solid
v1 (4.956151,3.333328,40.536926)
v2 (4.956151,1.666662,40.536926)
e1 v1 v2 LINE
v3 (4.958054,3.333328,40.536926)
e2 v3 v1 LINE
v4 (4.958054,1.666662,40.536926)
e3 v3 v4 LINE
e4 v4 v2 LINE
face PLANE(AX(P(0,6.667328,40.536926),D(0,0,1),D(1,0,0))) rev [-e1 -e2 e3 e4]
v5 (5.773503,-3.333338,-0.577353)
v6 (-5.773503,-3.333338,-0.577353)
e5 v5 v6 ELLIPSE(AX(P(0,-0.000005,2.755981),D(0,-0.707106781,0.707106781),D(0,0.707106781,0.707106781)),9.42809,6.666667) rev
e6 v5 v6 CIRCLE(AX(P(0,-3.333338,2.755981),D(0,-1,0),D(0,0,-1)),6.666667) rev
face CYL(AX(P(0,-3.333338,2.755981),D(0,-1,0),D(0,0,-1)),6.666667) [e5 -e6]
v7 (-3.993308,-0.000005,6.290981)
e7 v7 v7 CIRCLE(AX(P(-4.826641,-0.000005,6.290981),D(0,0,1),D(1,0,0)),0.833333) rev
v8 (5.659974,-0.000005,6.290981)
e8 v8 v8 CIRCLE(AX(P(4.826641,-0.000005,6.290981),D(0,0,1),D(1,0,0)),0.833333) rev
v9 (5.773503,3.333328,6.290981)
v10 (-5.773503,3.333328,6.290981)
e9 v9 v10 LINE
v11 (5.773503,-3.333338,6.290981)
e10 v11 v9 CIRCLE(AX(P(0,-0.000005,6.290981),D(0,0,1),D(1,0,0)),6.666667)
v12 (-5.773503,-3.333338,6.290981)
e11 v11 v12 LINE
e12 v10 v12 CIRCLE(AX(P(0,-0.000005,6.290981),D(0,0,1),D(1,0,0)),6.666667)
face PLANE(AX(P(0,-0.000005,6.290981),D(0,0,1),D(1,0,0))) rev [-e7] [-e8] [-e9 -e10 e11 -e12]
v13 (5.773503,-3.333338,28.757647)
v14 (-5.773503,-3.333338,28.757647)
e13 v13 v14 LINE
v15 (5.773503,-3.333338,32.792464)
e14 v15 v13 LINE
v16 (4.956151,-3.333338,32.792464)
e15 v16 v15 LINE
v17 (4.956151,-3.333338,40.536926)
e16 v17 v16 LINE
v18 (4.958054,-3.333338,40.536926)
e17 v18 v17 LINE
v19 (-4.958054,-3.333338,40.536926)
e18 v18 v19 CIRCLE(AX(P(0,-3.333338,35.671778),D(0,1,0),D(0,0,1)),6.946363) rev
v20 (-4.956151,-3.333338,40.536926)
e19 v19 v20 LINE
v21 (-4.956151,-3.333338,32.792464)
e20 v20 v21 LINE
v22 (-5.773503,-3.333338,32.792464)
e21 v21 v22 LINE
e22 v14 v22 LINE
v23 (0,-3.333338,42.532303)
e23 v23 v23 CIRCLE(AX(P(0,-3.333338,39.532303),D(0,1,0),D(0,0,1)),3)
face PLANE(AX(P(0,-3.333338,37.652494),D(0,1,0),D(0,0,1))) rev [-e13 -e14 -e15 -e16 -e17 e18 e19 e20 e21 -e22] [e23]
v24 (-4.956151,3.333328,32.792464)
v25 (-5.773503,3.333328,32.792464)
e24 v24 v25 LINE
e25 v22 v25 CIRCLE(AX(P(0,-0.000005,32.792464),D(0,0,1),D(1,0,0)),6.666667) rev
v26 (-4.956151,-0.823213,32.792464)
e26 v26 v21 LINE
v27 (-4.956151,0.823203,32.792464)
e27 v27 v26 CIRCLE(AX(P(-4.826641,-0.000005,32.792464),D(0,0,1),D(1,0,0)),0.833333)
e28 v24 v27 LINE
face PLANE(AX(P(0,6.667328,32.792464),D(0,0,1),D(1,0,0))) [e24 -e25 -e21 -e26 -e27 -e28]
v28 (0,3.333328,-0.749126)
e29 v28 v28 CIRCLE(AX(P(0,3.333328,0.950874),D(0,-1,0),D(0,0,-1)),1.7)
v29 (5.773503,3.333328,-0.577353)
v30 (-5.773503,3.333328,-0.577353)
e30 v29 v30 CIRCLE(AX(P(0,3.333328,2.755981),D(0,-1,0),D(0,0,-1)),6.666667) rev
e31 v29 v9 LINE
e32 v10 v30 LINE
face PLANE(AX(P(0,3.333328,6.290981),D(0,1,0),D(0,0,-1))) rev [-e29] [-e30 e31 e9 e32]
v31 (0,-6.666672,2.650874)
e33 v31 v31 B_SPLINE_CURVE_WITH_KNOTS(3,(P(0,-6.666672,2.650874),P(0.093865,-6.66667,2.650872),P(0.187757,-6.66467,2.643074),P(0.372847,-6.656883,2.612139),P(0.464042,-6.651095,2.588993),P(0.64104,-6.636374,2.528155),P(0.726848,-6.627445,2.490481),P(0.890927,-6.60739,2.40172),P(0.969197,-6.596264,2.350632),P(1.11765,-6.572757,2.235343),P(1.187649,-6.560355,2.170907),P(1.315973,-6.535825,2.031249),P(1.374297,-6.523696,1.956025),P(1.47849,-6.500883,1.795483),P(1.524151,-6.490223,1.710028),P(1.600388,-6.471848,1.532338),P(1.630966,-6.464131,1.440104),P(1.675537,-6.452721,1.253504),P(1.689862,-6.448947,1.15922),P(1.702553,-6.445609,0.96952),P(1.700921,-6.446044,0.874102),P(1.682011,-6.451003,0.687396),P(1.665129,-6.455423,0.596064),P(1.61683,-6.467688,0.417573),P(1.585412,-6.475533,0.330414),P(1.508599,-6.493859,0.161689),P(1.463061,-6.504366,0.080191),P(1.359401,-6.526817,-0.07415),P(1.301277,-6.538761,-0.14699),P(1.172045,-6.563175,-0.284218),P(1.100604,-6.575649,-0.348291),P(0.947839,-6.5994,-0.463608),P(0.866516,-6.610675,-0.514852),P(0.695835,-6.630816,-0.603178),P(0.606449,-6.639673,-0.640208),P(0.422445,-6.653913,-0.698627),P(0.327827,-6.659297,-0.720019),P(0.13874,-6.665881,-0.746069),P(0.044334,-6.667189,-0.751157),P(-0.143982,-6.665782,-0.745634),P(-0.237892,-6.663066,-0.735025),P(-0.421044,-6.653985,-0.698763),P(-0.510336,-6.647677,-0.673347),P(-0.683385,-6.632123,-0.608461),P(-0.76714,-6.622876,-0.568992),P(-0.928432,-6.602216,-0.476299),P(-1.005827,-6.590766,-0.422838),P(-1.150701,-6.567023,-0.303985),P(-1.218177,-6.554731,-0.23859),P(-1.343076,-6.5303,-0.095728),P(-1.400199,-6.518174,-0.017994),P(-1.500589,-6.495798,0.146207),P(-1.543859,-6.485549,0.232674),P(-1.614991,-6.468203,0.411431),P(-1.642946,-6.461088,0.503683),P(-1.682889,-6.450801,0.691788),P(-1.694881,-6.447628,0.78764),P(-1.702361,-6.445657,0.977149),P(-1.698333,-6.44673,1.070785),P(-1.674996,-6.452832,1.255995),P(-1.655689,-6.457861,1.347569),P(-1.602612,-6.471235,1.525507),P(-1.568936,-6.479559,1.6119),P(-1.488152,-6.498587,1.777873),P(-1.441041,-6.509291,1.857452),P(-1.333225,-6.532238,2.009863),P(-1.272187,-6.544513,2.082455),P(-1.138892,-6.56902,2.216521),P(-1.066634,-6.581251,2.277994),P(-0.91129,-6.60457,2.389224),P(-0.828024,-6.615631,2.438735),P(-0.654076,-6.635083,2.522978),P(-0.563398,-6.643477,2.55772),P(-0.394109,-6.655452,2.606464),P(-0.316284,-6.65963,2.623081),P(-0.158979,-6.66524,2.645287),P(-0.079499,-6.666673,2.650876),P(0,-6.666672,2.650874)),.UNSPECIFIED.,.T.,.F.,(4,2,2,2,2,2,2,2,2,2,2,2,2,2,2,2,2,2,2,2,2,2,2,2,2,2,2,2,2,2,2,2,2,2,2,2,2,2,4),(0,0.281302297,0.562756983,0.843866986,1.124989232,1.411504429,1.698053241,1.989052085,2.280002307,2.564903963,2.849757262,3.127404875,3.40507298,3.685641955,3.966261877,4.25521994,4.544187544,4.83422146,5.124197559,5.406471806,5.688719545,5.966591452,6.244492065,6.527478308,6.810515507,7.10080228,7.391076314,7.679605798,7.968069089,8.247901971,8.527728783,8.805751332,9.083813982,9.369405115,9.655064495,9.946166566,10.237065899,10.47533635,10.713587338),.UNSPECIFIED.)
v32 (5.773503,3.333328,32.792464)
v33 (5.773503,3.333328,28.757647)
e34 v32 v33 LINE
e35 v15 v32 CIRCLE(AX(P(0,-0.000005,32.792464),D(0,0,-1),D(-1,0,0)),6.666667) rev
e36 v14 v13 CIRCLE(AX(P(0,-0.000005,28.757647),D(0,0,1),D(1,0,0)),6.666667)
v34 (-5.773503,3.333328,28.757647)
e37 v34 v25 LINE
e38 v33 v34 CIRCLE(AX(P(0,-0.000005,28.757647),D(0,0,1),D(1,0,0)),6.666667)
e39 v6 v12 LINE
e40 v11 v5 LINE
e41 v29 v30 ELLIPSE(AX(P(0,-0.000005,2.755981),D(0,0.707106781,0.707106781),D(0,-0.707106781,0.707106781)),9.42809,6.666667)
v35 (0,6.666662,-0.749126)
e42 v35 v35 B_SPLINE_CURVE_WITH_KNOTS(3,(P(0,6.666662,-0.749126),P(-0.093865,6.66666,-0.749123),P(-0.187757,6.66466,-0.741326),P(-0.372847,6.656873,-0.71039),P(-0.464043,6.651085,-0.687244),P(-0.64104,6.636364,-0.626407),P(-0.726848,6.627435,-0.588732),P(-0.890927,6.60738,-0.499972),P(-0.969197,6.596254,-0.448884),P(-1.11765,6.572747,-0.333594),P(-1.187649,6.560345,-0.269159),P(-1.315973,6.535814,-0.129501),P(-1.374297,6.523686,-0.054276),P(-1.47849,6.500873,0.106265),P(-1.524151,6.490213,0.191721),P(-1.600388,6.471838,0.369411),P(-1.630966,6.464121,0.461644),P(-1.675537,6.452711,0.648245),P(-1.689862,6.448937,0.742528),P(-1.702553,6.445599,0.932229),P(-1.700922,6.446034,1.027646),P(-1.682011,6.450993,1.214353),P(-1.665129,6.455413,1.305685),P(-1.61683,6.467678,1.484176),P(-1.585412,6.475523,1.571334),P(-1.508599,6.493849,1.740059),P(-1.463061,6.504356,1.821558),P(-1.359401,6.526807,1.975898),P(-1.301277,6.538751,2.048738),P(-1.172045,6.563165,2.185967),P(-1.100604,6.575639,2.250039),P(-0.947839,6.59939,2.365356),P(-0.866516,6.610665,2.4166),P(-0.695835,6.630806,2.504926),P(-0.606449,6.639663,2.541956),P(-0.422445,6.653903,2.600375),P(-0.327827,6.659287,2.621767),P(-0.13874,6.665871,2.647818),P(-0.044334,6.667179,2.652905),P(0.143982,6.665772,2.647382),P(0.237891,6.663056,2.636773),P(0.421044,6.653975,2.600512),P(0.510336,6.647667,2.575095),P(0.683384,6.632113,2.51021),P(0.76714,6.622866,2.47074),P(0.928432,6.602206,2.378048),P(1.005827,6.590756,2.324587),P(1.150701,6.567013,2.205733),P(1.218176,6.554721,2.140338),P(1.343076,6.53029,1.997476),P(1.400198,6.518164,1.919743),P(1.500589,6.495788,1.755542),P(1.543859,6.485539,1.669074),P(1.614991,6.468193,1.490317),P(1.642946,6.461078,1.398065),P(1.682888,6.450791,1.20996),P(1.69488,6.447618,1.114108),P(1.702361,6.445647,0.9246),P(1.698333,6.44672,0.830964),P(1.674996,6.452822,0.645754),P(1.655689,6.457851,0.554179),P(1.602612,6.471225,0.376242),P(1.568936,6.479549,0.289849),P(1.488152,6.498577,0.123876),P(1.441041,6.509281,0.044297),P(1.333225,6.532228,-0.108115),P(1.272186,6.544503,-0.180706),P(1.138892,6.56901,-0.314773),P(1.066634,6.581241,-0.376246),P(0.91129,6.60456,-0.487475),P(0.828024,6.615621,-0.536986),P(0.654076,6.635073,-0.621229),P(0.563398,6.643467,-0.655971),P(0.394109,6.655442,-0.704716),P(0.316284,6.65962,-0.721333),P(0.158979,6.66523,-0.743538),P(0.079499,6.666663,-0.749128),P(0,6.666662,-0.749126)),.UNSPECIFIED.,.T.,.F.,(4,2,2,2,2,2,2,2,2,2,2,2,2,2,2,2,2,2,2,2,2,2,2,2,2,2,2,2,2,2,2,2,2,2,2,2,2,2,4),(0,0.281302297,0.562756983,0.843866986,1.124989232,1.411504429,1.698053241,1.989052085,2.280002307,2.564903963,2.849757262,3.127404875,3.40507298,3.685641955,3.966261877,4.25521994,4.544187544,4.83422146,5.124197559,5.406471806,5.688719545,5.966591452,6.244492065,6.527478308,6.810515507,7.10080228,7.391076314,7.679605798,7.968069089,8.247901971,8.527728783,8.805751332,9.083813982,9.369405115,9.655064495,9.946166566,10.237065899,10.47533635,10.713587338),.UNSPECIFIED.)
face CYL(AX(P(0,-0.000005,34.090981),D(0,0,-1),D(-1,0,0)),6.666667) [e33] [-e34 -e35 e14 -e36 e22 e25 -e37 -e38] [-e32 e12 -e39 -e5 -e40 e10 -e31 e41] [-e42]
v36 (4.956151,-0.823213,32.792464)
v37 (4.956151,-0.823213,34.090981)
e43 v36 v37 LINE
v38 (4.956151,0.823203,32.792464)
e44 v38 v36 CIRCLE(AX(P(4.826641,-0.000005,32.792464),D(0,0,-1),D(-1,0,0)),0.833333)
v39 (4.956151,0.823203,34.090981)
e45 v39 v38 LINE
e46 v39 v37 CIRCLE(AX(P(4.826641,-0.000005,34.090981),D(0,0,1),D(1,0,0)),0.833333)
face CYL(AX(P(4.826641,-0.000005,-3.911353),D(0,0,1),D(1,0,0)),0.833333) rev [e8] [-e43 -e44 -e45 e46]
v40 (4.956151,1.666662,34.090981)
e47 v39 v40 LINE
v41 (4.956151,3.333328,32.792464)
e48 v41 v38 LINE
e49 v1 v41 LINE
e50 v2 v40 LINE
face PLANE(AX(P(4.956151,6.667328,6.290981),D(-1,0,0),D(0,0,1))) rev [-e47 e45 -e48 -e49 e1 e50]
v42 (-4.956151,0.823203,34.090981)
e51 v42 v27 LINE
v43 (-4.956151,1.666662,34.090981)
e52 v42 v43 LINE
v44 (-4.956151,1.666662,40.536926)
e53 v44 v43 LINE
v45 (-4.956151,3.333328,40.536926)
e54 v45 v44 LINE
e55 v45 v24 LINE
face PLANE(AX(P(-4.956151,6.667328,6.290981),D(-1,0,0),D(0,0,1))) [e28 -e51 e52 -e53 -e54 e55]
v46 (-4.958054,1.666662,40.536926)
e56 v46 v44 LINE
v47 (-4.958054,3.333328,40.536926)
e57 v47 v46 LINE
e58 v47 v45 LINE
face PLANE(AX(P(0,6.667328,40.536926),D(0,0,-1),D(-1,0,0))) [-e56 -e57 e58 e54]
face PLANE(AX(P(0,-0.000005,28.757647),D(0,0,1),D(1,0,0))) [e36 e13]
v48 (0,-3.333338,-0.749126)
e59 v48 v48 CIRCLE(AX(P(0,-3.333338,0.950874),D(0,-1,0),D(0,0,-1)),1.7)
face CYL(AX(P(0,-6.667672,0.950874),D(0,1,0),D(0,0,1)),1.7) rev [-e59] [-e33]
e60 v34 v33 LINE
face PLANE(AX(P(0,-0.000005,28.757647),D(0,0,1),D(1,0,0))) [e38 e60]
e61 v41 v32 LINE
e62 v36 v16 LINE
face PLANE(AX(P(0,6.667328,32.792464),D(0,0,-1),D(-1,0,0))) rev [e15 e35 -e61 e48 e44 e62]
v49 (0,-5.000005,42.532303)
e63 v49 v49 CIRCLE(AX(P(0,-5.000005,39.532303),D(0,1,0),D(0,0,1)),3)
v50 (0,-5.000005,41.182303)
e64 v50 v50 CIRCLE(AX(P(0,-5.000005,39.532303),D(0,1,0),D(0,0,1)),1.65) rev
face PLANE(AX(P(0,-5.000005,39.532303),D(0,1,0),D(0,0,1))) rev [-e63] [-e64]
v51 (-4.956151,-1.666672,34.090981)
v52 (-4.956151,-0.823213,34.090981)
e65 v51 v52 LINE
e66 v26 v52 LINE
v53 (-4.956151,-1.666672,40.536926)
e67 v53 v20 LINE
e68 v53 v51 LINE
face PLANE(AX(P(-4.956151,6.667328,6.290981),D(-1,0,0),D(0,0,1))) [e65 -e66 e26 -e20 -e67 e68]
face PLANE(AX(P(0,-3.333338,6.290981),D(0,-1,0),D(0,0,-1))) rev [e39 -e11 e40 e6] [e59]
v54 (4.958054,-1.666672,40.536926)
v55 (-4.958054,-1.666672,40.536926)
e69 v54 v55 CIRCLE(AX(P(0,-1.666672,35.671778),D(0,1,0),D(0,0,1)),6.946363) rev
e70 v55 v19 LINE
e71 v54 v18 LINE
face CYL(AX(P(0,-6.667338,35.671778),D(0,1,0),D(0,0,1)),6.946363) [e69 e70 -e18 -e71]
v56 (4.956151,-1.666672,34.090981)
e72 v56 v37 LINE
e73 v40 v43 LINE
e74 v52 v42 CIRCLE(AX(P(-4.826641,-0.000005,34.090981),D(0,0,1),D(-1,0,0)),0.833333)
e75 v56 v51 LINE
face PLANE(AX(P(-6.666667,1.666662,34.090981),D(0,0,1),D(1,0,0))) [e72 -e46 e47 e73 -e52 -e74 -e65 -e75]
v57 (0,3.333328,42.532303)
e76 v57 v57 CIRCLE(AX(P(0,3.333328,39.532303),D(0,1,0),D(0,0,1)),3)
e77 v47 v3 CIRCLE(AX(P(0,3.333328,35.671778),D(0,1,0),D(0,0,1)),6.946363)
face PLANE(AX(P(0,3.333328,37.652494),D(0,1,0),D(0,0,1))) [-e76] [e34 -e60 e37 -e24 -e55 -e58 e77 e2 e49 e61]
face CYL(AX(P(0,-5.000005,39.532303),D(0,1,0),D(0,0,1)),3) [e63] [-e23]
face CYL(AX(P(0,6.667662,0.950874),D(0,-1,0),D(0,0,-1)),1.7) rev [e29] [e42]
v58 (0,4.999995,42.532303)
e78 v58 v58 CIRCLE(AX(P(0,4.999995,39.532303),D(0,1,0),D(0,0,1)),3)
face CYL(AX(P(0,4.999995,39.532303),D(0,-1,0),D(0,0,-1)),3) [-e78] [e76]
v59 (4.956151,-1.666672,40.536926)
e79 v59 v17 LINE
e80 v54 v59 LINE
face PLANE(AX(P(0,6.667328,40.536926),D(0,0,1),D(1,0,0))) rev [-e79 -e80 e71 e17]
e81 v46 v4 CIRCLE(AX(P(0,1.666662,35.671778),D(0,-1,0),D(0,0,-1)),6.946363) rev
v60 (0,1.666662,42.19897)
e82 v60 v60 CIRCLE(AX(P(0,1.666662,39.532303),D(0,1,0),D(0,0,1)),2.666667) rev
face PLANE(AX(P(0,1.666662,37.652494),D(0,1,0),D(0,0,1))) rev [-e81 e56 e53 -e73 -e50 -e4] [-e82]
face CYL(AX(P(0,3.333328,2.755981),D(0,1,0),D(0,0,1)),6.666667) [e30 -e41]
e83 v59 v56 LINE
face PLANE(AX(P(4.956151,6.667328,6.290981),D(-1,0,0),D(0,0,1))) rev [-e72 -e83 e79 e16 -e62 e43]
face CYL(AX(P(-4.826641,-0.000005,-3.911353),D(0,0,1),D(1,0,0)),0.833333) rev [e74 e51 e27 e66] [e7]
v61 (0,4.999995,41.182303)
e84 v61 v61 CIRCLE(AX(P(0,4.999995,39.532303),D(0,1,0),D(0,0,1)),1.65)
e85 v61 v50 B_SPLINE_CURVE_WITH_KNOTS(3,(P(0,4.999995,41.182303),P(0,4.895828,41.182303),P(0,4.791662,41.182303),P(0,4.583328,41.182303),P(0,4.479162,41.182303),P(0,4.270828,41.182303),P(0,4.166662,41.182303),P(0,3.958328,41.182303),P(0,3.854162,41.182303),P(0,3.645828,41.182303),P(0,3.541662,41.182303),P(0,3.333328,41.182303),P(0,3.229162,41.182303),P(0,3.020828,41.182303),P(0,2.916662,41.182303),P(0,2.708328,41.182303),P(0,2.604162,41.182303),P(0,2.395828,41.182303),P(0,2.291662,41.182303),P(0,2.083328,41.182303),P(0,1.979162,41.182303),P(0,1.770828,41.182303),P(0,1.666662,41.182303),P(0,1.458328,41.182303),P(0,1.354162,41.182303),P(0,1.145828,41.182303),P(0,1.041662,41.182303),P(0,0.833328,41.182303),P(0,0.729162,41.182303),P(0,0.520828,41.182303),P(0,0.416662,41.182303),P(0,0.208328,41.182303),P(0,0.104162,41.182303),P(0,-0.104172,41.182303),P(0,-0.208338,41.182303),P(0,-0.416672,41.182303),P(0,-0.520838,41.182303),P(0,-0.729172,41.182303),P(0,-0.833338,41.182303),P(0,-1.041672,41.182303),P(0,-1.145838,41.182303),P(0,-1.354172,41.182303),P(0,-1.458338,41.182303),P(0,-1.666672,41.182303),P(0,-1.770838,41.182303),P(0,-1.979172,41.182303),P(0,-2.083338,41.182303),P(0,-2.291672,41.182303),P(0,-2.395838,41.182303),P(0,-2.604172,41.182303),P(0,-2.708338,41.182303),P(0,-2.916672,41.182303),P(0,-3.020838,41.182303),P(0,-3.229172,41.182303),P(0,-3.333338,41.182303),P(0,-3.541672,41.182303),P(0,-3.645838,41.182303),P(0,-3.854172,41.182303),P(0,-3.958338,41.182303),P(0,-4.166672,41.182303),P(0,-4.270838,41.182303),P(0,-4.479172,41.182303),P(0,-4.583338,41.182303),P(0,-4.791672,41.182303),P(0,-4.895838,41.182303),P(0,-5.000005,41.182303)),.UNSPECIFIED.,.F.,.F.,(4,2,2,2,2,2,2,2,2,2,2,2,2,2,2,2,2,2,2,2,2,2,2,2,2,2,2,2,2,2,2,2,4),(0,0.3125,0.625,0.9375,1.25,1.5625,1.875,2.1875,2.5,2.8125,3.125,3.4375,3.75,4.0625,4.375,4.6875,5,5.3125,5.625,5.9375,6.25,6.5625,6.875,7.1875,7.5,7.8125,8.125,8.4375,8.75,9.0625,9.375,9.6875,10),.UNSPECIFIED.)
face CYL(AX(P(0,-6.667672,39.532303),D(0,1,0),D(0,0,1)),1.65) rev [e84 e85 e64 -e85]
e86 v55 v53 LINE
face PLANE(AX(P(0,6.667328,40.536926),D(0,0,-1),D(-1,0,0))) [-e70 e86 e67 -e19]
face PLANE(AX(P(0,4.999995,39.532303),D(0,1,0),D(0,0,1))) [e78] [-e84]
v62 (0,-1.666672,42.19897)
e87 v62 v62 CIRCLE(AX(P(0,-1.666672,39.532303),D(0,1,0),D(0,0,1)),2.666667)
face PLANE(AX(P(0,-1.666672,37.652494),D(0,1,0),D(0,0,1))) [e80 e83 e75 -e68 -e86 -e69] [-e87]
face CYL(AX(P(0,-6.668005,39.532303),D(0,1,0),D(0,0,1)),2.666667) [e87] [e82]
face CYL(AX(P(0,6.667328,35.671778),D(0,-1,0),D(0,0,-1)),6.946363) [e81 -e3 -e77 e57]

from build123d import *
from build123d.topology import SkipClean

# Parameters (mm, degrees)
SKETCH2_R                       = 10
PHALANGE_LENGTH_DEPTH           = 41.7
BOSS_EXTRUDE3_DEPTH             = 5
BOSS_EXTRUDE4_DEPTH             = 5
BOSS_EXTRUDE4_DEPTH_BACK        = 5
CUT_EXTRUDE2_START              = -15.3025
CUT_EXTRUDE2_DEPTH              = 15.3025
SKETCH7_R                       = 1.65
CUT_EXTRUDE3_DEPTH              = 10
CUT_EXTRUDE4_DEPTH              = 2.5
CUT_EXTRUDE4_DEPTH_BACK         = 2.5
CUT_EXTRUDE7_REACH              = 61.833
SKETCH4_R                       = 1.65
CUT_EXTRUDE7_DIRECTION_2_REACH  = 61.833
CUT_EXTRUDE_THIN1_START         = 41.7
CUT_EXTRUDE_THIN1_DEPTH         = 10.361670454
BOSS_EXTRUDE5_REACH             = 61.255
SKETCH9_R                       = 4
SKETCH9_R_2                     = 1.65
CUT_EXTRUDE8_REACH              = 60.731
SKETCH10_R                      = 1.25
CUT_EXTRUDE9_START              = -8
CUT_EXTRUDE9_DEPTH              = 8
CUT_EXTRUDE10_REACH             = 61.255
CUT_EXTRUDE10_DIRECTION_2_REACH = 61.255
CUT_EXTRUDE11_START             = -10
CUT_EXTRUDE11_OUTLINE_W         = 2.565773848
CUT_EXTRUDE11_OUTLINE_H         = 11.6166929
CUT_EXTRUDE11_DEPTH             = 10
BOSS_EXTRUDE6_START             = 7.5
SKETCH14_R                      = 4.5
SKETCH14_R_2                    = 1.65
BOSS_EXTRUDE6_DEPTH             = 2.5
BOSS_EXTRUDE7_START             = -7.5
SKETCH14_2_R                    = 4.5
SKETCH14_2_R_2                  = 1.65
BOSS_EXTRUDE7_DEPTH             = 2.5
SCALE1_SCALE                    = 0.666666667
CUT_EXTRUDE12_START             = -11.666667
SKETCH15_R                      = 1.65
CUT_EXTRUDE12_DEPTH             = 13.333339
CUT_EXTRUDE13_REACH             = 46.28
SKETCH16_R                      = 1.7
CUT_EXTRUDE13_DIRECTION_2_REACH = 46.28


# Read off the part's stored shape, not the designer's step: Cut-Extrude-Thin1, Cut-Extrude11
with BuildPart() as part:
    # Sketch2 → Phalange Length (new body)
    with BuildSketch(Plane.XY):
        Circle(SKETCH2_R)
    extrude(amount=PHALANGE_LENGTH_DEPTH)

    # Sketch3 → Boss-Extrude3 (add)
    with BuildSketch(Plane(origin=(0, -10, 0), x_dir=(-1, 0, 0), z_dir=(0, -1, 0))):
        with BuildLine():
            Line((-10, 5.302499701), (-10, 0))
            Line((-10, 0), (10, 0))
            Line((10, 0), (10, 5.302499701))
            ThreePointArc((10, 5.302499701), (0, 15.302499701), (-10, 5.302499701))
        make_face()
    boss_extrude3 = extrude(amount=-BOSS_EXTRUDE3_DEPTH)

    # Mirror1: Boss-Extrude3 across plane
    add(boss_extrude3.mirror(Plane.ZX))

    # Sketch5 → Boss-Extrude4 (add, two sides: drawn at the far end of the back side and taken through both)
    with BuildSketch(Plane(origin=(0, 0, 0), x_dir=(1, 0, 0), z_dir=(0, 1, 0)).offset(-BOSS_EXTRUDE4_DEPTH_BACK)):
        with BuildLine():
            Line((-10, -47.483157911), (-10, -41.7))
            Line((-10, -41.7), (10, -41.7))
            Line((10, -41.7), (10, -47.483157911))
            ThreePointArc((10, -47.483157911), (0, -57.051984156), (-10, -47.483157911))
        make_face()
    extrude(amount=BOSS_EXTRUDE4_DEPTH + BOSS_EXTRUDE4_DEPTH_BACK)

    # Sketch6 → Cut-Extrude2 (cut)
    with SkipClean():  # the faces are left unmerged after this step: merging them gives an invalid solid
        with BuildSketch(Plane.XY.offset(CUT_EXTRUDE2_START)):
            with BuildLine():
                ThreePointArc((0, 10), (5, 8.660254038), (8.660254038, 5))
                Line((8.660254038, 5), (10, 5))
                Line((10, 5), (10, 10))
                Line((10, 10), (0, 10))
            make_face()
            with BuildLine():
                Line((10, -5), (8.660254038, -5))
                ThreePointArc((8.660254038, -5), (5, -8.660254038), (0, -10))
                Line((0, -10), (10, -10))
                Line((10, -10), (10, -5))
            make_face()
            with BuildLine():
                ThreePointArc((-8.660254038, 5), (-5, 8.660254038), (0, 10))
                Line((0, 10), (-10, 10))
                Line((-10, 10), (-10, 5))
                Line((-10, 5), (-8.660254038, 5))
            make_face()
            with BuildLine():
                Line((-10, -10), (0, -10))
                ThreePointArc((0, -10), (-5, -8.660254038), (-8.660254038, -5))
                Line((-8.660254038, -5), (-10, -5))
                Line((-10, -5), (-10, -10))
            make_face()
        extrude(amount=CUT_EXTRUDE2_DEPTH, mode=Mode.SUBTRACT)

    # Sketch7 → Cut-Extrude3 (cut)
    with SkipClean():  # the faces are left unmerged after this step: merging them gives an invalid solid
        with BuildSketch(Plane(origin=(0, 5, 0), x_dir=(1, 0, 0), z_dir=(0, 1, 0))):
            with Locations(Location((0, -49.861984156, 0), (0, 0, 270))):
                Circle(SKETCH7_R)
        extrude(amount=-CUT_EXTRUDE3_DEPTH, mode=Mode.SUBTRACT)

    # Sketch5<2> → Cut-Extrude4 (cut, two sides: drawn at the far end of the back side and taken through both)
    with BuildSketch(Plane(origin=(0, 0, 0), x_dir=(1, 0, 0), z_dir=(0, 1, 0)).offset(-CUT_EXTRUDE4_DEPTH_BACK)):
        with BuildLine():
            Line((-10, -47.483157911), (-10, -41.7))
            Line((-10, -41.7), (10, -41.7))
            Line((10, -41.7), (10, -47.483157911))
            ThreePointArc((10, -47.483157911), (0, -57.051984156), (-10, -47.483157911))
        make_face()
    extrude(amount=CUT_EXTRUDE4_DEPTH + CUT_EXTRUDE4_DEPTH_BACK, mode=Mode.SUBTRACT)

    # Sketch4 → Cut-Extrude7 (cut, up to next)
    with BuildSketch(Plane(origin=(0, -5, 0), x_dir=(1, 0, 0), z_dir=(0, 1, 0)), mode=Mode.PRIVATE) as cut_extrude7_sk1:
        with Locations(Location((0, 8.010159673, 0), (0, 0, 270))):
            Circle(SKETCH4_R)
    cut_extrude7_tool1 = extrude(cut_extrude7_sk1.sketch, amount=-CUT_EXTRUDE7_REACH, mode=Mode.PRIVATE) & part.part
    add(cut_extrude7_tool1.solids().sort_by_distance((0, -5, -8.01016))[0], mode=Mode.SUBTRACT)

    # Sketch4 → Cut-Extrude7 direction 2 (cut, up to next)
    with BuildSketch(Plane(origin=(0, -5, 0), x_dir=(1, 0, 0), z_dir=(0, 1, 0)), mode=Mode.PRIVATE) as cut_extrude7_direction_2_sk1:
        with Locations(Location((0, 8.010159673, 0), (0, 0, 270))):
            Circle(SKETCH4_R)
    cut_extrude7_direction_2_tool1 = extrude(cut_extrude7_direction_2_sk1.sketch, amount=CUT_EXTRUDE7_DIRECTION_2_REACH, mode=Mode.PRIVATE) & part.part
    add(cut_extrude7_direction_2_tool1.solids().sort_by_distance((0, -5, -8.01016))[0], mode=Mode.SUBTRACT)

    # Cut-Extrude-Thin1 outline → Cut-Extrude-Thin1 (cut)
    with SkipClean():  # the faces are left unmerged after this step: merging them gives an invalid solid
        with BuildSketch(Plane.XY.offset(CUT_EXTRUDE_THIN1_START)):
            with BuildLine():
                ThreePointArc((8.660254038, 5), (9.256147934, 3.78466979), (9.682458366, 2.5))
                Line((9.682458366, 2.5), (10, 2.5))
                Line((10, 2.5), (10, 5))
                Line((10, 5), (8.660254038, 5))
            make_face()
            with BuildLine():
                Line((10, -2.5), (9.682458366, -2.5))
                ThreePointArc((9.682458366, -2.5), (9.256147934, -3.78466979), (8.660254038, -5))
                Line((8.660254038, -5), (10, -5))
                Line((10, -5), (10, -2.5))
            make_face()
            with BuildLine():
                Line((-10, 2.5), (-9.682458366, 2.5))
                ThreePointArc((-9.682458366, 2.5), (-9.256147934, 3.78466979), (-8.660254038, 5))
                Line((-8.660254038, 5), (-10, 5))
                Line((-10, 5), (-10, 2.5))
            make_face()
            with BuildLine():
                ThreePointArc((-8.660254038, -5), (-9.256147934, -3.78466979), (-9.682458366, -2.5))
                Line((-9.682458366, -2.5), (-10, -2.5))
                Line((-10, -2.5), (-10, -5))
                Line((-10, -5), (-8.660254038, -5))
            make_face()
        extrude(amount=CUT_EXTRUDE_THIN1_DEPTH, mode=Mode.SUBTRACT)

    # Sketch9 → Boss-Extrude5 (add, up to next)
    with BuildSketch(Plane.XZ.offset(-2.5), mode=Mode.PRIVATE) as boss_extrude5_sk1:
        with Locations(Location((0, 49.861984156, 0), (0, 0, 90))):
            Circle(SKETCH9_R)
        with Locations(Location((0, 49.861984156, 0), (0, 0, 90))):
            Circle(SKETCH9_R_2, mode=Mode.SUBTRACT)
    boss_extrude5_tool1 = extrude(boss_extrude5_sk1.sketch, amount=BOSS_EXTRUDE5_REACH, mode=Mode.PRIVATE) - part.part
    add(boss_extrude5_tool1.solids().sort_by_distance((0, 2.5, 45.975121))[0])

    # Sketch10 → Cut-Extrude8 (cut, up to next)
    with BuildSketch(Plane.XY.offset(41.7), mode=Mode.PRIVATE) as cut_extrude8_sk1:
        with Locations((7.239961745, 0)):
            Circle(SKETCH10_R)
    cut_extrude8_tool1 = extrude(cut_extrude8_sk1.sketch, amount=-CUT_EXTRUDE8_REACH, mode=Mode.PRIVATE) & part.part
    # Sketch10 → Cut-Extrude8 (cut, up to next)
    with BuildSketch(Plane.XY.offset(41.7), mode=Mode.PRIVATE) as cut_extrude8_sk2:
        with Locations((-7.239961745, 0)):
            Circle(SKETCH10_R)
    cut_extrude8_tool2 = extrude(cut_extrude8_sk2.sketch, amount=-CUT_EXTRUDE8_REACH, mode=Mode.PRIVATE) & part.part
    add(cut_extrude8_tool1.solids().sort_by_distance((7.239962, 0, 41.7))[0], mode=Mode.SUBTRACT)
    add(cut_extrude8_tool2.solids().sort_by_distance((-7.239962, 0, 41.7))[0], mode=Mode.SUBTRACT)

    # Sketch11 → Cut-Extrude9 (cut)
    with SkipClean():  # the faces are left unmerged after this step: merging them gives an invalid solid
        with BuildSketch(Plane.XY.offset(41.7).offset(CUT_EXTRUDE9_START)):
            with BuildLine():
                ThreePointArc((8.660254038, 5), (0, 10), (-8.660254038, 5))
                Line((-8.660254038, 5), (8.660254038, 5))
            make_face()
            with BuildLine():
                Line((8.660254038, -5), (-8.660254038, -5))
                ThreePointArc((-8.660254038, -5), (0, -10), (8.660254038, -5))
            make_face()
        extrude(amount=CUT_EXTRUDE9_DEPTH, mode=Mode.SUBTRACT)

    # Sketch12 → Cut-Extrude10 (cut, up to next)
    with BuildSketch(Plane.XZ.offset(-2.5), mode=Mode.PRIVATE) as cut_extrude10_sk1:
        with BuildLine():
            Line((-10.033719202, 57.051984156), (-10.033719202, 49.864892021))
            Line((-10.033719202, 49.864892021), (-8.660254038, 49.864892021))
            ThreePointArc((-8.660254038, 49.864892021), (0, 54.490740593), (8.660254038, 49.864892021))
            Line((8.660254038, 49.864892021), (10.033719202, 49.864892021))
            Line((10.033719202, 49.864892021), (10.033719202, 57.051984156))
            Line((10.033719202, 57.051984156), (-10.033719202, 57.051984156))
        make_face()
    cut_extrude10_tool1 = extrude(cut_extrude10_sk1.sketch, amount=CUT_EXTRUDE10_REACH, mode=Mode.PRIVATE) & part.part
    add(cut_extrude10_tool1.solids().sort_by_distance((0, 2.5, 54.550279))[0], mode=Mode.SUBTRACT)

    # Sketch12 → Cut-Extrude10 direction 2 (cut, up to next)
    with BuildSketch(Plane.XZ.offset(-2.5), mode=Mode.PRIVATE) as cut_extrude10_direction_2_sk1:
        with BuildLine():
            Line((-10.033719202, 57.051984156), (-10.033719202, 49.864892021))
            Line((-10.033719202, 49.864892021), (-8.660254038, 49.864892021))
            ThreePointArc((-8.660254038, 49.864892021), (0, 54.490740593), (8.660254038, 49.864892021))
            Line((8.660254038, 49.864892021), (10.033719202, 49.864892021))
            Line((10.033719202, 49.864892021), (10.033719202, 57.051984156))
            Line((10.033719202, 57.051984156), (-10.033719202, 57.051984156))
        make_face()
    cut_extrude10_direction_2_tool1 = extrude(cut_extrude10_direction_2_sk1.sketch, amount=-CUT_EXTRUDE10_DIRECTION_2_REACH, mode=Mode.PRIVATE) & part.part
    add(cut_extrude10_direction_2_tool1.solids().sort_by_distance((0, 2.5, 54.550279))[0], mode=Mode.SUBTRACT)

    # Cut-Extrude11 outline → Cut-Extrude11 (cut)
    with BuildSketch(Plane.XZ.offset(5).offset(CUT_EXTRUDE11_START)):
        with Locations((-8.717113076, 45.560571369)):
            Rectangle(CUT_EXTRUDE11_OUTLINE_W, CUT_EXTRUDE11_OUTLINE_H)
        with Locations((8.717113076, 45.560571369)):
            Rectangle(CUT_EXTRUDE11_OUTLINE_W, CUT_EXTRUDE11_OUTLINE_H)
    extrude(amount=CUT_EXTRUDE11_DEPTH, mode=Mode.SUBTRACT)

    # Sketch14 → Boss-Extrude6 (add)
    with SkipClean():  # the faces are left unmerged after this step: merging them gives an invalid solid
        with BuildSketch(Plane(origin=(0, 0, 0), x_dir=(1, 0, 0), z_dir=(0, 1, 0)).offset(BOSS_EXTRUDE6_START)):
            with Locations(Location((0, -49.861984156, 0), (0, 0, 270))):
                Circle(SKETCH14_R)
            with Locations(Location((0, -49.861984156, 0), (0, 0, 270))):
                Circle(SKETCH14_R_2, mode=Mode.SUBTRACT)
        extrude(amount=-BOSS_EXTRUDE6_DEPTH)

    # Sketch14<2> → Boss-Extrude7 (add)
    with SkipClean():  # the faces are left unmerged after this step: merging them gives an invalid solid
        with BuildSketch(Plane(origin=(0, 0, 0), x_dir=(1, 0, 0), z_dir=(0, 1, 0)).offset(BOSS_EXTRUDE7_START)):
            with Locations(Location((0, -49.861984156, 0), (0, 0, 270))):
                Circle(SKETCH14_2_R)
            with Locations(Location((0, -49.861984156, 0), (0, 0, 270))):
                Circle(SKETCH14_2_R_2, mode=Mode.SUBTRACT)
        extrude(amount=BOSS_EXTRUDE7_DEPTH)


with BuildPart() as part_1:
    # Scale1: scaled about (1e-09, 5e-08, 18.872441715)
    add(part.part.scale(SCALE1_SCALE).moved(Location((0, 1.7e-08, 6.290813905))))

    # Sketch15 → Cut-Extrude12 (cut)
    with BuildSketch(Plane(origin=(0, 4.999994989, 0), x_dir=(1, 0, 0), z_dir=(0, 1, 0)).offset(CUT_EXTRUDE12_START)):
        with Locations(Location((-4.1e-08, -39.532303396, 0), (0, 0, 270))):
            Circle(SKETCH15_R)
    extrude(amount=CUT_EXTRUDE12_DEPTH, mode=Mode.SUBTRACT)

    # Sketch16 → Cut-Extrude13 (cut, up to next)
    with BuildSketch(Plane.XZ.offset(-3.333328323), mode=Mode.PRIVATE) as cut_extrude13_sk1:
        with Locations(Location((-4.1e-08, 0.950874177, 0), (0, 0, 270))):
            Circle(SKETCH16_R)
    cut_extrude13_tool1 = extrude(cut_extrude13_sk1.sketch, amount=-CUT_EXTRUDE13_REACH, mode=Mode.PRIVATE) & part_1.part
    add(cut_extrude13_tool1.solids().sort_by_distance((0, 3.333328, 0.950874))[0], mode=Mode.SUBTRACT)

    # Sketch16 → Cut-Extrude13 direction 2 (cut, up to next)
    with BuildSketch(Plane.XZ.offset(-3.333328323), mode=Mode.PRIVATE) as cut_extrude13_direction_2_sk1:
        with Locations(Location((-4.1e-08, 0.950874177, 0), (0, 0, 270))):
            Circle(SKETCH16_R)
    cut_extrude13_direction_2_tool1 = extrude(cut_extrude13_direction_2_sk1.sketch, amount=CUT_EXTRUDE13_DIRECTION_2_REACH, mode=Mode.PRIVATE) & part_1.part
    add(cut_extrude13_direction_2_tool1.solids().sort_by_distance((0, 3.333328, 0.950874))[0], mode=Mode.SUBTRACT)


solid = part_1.part
